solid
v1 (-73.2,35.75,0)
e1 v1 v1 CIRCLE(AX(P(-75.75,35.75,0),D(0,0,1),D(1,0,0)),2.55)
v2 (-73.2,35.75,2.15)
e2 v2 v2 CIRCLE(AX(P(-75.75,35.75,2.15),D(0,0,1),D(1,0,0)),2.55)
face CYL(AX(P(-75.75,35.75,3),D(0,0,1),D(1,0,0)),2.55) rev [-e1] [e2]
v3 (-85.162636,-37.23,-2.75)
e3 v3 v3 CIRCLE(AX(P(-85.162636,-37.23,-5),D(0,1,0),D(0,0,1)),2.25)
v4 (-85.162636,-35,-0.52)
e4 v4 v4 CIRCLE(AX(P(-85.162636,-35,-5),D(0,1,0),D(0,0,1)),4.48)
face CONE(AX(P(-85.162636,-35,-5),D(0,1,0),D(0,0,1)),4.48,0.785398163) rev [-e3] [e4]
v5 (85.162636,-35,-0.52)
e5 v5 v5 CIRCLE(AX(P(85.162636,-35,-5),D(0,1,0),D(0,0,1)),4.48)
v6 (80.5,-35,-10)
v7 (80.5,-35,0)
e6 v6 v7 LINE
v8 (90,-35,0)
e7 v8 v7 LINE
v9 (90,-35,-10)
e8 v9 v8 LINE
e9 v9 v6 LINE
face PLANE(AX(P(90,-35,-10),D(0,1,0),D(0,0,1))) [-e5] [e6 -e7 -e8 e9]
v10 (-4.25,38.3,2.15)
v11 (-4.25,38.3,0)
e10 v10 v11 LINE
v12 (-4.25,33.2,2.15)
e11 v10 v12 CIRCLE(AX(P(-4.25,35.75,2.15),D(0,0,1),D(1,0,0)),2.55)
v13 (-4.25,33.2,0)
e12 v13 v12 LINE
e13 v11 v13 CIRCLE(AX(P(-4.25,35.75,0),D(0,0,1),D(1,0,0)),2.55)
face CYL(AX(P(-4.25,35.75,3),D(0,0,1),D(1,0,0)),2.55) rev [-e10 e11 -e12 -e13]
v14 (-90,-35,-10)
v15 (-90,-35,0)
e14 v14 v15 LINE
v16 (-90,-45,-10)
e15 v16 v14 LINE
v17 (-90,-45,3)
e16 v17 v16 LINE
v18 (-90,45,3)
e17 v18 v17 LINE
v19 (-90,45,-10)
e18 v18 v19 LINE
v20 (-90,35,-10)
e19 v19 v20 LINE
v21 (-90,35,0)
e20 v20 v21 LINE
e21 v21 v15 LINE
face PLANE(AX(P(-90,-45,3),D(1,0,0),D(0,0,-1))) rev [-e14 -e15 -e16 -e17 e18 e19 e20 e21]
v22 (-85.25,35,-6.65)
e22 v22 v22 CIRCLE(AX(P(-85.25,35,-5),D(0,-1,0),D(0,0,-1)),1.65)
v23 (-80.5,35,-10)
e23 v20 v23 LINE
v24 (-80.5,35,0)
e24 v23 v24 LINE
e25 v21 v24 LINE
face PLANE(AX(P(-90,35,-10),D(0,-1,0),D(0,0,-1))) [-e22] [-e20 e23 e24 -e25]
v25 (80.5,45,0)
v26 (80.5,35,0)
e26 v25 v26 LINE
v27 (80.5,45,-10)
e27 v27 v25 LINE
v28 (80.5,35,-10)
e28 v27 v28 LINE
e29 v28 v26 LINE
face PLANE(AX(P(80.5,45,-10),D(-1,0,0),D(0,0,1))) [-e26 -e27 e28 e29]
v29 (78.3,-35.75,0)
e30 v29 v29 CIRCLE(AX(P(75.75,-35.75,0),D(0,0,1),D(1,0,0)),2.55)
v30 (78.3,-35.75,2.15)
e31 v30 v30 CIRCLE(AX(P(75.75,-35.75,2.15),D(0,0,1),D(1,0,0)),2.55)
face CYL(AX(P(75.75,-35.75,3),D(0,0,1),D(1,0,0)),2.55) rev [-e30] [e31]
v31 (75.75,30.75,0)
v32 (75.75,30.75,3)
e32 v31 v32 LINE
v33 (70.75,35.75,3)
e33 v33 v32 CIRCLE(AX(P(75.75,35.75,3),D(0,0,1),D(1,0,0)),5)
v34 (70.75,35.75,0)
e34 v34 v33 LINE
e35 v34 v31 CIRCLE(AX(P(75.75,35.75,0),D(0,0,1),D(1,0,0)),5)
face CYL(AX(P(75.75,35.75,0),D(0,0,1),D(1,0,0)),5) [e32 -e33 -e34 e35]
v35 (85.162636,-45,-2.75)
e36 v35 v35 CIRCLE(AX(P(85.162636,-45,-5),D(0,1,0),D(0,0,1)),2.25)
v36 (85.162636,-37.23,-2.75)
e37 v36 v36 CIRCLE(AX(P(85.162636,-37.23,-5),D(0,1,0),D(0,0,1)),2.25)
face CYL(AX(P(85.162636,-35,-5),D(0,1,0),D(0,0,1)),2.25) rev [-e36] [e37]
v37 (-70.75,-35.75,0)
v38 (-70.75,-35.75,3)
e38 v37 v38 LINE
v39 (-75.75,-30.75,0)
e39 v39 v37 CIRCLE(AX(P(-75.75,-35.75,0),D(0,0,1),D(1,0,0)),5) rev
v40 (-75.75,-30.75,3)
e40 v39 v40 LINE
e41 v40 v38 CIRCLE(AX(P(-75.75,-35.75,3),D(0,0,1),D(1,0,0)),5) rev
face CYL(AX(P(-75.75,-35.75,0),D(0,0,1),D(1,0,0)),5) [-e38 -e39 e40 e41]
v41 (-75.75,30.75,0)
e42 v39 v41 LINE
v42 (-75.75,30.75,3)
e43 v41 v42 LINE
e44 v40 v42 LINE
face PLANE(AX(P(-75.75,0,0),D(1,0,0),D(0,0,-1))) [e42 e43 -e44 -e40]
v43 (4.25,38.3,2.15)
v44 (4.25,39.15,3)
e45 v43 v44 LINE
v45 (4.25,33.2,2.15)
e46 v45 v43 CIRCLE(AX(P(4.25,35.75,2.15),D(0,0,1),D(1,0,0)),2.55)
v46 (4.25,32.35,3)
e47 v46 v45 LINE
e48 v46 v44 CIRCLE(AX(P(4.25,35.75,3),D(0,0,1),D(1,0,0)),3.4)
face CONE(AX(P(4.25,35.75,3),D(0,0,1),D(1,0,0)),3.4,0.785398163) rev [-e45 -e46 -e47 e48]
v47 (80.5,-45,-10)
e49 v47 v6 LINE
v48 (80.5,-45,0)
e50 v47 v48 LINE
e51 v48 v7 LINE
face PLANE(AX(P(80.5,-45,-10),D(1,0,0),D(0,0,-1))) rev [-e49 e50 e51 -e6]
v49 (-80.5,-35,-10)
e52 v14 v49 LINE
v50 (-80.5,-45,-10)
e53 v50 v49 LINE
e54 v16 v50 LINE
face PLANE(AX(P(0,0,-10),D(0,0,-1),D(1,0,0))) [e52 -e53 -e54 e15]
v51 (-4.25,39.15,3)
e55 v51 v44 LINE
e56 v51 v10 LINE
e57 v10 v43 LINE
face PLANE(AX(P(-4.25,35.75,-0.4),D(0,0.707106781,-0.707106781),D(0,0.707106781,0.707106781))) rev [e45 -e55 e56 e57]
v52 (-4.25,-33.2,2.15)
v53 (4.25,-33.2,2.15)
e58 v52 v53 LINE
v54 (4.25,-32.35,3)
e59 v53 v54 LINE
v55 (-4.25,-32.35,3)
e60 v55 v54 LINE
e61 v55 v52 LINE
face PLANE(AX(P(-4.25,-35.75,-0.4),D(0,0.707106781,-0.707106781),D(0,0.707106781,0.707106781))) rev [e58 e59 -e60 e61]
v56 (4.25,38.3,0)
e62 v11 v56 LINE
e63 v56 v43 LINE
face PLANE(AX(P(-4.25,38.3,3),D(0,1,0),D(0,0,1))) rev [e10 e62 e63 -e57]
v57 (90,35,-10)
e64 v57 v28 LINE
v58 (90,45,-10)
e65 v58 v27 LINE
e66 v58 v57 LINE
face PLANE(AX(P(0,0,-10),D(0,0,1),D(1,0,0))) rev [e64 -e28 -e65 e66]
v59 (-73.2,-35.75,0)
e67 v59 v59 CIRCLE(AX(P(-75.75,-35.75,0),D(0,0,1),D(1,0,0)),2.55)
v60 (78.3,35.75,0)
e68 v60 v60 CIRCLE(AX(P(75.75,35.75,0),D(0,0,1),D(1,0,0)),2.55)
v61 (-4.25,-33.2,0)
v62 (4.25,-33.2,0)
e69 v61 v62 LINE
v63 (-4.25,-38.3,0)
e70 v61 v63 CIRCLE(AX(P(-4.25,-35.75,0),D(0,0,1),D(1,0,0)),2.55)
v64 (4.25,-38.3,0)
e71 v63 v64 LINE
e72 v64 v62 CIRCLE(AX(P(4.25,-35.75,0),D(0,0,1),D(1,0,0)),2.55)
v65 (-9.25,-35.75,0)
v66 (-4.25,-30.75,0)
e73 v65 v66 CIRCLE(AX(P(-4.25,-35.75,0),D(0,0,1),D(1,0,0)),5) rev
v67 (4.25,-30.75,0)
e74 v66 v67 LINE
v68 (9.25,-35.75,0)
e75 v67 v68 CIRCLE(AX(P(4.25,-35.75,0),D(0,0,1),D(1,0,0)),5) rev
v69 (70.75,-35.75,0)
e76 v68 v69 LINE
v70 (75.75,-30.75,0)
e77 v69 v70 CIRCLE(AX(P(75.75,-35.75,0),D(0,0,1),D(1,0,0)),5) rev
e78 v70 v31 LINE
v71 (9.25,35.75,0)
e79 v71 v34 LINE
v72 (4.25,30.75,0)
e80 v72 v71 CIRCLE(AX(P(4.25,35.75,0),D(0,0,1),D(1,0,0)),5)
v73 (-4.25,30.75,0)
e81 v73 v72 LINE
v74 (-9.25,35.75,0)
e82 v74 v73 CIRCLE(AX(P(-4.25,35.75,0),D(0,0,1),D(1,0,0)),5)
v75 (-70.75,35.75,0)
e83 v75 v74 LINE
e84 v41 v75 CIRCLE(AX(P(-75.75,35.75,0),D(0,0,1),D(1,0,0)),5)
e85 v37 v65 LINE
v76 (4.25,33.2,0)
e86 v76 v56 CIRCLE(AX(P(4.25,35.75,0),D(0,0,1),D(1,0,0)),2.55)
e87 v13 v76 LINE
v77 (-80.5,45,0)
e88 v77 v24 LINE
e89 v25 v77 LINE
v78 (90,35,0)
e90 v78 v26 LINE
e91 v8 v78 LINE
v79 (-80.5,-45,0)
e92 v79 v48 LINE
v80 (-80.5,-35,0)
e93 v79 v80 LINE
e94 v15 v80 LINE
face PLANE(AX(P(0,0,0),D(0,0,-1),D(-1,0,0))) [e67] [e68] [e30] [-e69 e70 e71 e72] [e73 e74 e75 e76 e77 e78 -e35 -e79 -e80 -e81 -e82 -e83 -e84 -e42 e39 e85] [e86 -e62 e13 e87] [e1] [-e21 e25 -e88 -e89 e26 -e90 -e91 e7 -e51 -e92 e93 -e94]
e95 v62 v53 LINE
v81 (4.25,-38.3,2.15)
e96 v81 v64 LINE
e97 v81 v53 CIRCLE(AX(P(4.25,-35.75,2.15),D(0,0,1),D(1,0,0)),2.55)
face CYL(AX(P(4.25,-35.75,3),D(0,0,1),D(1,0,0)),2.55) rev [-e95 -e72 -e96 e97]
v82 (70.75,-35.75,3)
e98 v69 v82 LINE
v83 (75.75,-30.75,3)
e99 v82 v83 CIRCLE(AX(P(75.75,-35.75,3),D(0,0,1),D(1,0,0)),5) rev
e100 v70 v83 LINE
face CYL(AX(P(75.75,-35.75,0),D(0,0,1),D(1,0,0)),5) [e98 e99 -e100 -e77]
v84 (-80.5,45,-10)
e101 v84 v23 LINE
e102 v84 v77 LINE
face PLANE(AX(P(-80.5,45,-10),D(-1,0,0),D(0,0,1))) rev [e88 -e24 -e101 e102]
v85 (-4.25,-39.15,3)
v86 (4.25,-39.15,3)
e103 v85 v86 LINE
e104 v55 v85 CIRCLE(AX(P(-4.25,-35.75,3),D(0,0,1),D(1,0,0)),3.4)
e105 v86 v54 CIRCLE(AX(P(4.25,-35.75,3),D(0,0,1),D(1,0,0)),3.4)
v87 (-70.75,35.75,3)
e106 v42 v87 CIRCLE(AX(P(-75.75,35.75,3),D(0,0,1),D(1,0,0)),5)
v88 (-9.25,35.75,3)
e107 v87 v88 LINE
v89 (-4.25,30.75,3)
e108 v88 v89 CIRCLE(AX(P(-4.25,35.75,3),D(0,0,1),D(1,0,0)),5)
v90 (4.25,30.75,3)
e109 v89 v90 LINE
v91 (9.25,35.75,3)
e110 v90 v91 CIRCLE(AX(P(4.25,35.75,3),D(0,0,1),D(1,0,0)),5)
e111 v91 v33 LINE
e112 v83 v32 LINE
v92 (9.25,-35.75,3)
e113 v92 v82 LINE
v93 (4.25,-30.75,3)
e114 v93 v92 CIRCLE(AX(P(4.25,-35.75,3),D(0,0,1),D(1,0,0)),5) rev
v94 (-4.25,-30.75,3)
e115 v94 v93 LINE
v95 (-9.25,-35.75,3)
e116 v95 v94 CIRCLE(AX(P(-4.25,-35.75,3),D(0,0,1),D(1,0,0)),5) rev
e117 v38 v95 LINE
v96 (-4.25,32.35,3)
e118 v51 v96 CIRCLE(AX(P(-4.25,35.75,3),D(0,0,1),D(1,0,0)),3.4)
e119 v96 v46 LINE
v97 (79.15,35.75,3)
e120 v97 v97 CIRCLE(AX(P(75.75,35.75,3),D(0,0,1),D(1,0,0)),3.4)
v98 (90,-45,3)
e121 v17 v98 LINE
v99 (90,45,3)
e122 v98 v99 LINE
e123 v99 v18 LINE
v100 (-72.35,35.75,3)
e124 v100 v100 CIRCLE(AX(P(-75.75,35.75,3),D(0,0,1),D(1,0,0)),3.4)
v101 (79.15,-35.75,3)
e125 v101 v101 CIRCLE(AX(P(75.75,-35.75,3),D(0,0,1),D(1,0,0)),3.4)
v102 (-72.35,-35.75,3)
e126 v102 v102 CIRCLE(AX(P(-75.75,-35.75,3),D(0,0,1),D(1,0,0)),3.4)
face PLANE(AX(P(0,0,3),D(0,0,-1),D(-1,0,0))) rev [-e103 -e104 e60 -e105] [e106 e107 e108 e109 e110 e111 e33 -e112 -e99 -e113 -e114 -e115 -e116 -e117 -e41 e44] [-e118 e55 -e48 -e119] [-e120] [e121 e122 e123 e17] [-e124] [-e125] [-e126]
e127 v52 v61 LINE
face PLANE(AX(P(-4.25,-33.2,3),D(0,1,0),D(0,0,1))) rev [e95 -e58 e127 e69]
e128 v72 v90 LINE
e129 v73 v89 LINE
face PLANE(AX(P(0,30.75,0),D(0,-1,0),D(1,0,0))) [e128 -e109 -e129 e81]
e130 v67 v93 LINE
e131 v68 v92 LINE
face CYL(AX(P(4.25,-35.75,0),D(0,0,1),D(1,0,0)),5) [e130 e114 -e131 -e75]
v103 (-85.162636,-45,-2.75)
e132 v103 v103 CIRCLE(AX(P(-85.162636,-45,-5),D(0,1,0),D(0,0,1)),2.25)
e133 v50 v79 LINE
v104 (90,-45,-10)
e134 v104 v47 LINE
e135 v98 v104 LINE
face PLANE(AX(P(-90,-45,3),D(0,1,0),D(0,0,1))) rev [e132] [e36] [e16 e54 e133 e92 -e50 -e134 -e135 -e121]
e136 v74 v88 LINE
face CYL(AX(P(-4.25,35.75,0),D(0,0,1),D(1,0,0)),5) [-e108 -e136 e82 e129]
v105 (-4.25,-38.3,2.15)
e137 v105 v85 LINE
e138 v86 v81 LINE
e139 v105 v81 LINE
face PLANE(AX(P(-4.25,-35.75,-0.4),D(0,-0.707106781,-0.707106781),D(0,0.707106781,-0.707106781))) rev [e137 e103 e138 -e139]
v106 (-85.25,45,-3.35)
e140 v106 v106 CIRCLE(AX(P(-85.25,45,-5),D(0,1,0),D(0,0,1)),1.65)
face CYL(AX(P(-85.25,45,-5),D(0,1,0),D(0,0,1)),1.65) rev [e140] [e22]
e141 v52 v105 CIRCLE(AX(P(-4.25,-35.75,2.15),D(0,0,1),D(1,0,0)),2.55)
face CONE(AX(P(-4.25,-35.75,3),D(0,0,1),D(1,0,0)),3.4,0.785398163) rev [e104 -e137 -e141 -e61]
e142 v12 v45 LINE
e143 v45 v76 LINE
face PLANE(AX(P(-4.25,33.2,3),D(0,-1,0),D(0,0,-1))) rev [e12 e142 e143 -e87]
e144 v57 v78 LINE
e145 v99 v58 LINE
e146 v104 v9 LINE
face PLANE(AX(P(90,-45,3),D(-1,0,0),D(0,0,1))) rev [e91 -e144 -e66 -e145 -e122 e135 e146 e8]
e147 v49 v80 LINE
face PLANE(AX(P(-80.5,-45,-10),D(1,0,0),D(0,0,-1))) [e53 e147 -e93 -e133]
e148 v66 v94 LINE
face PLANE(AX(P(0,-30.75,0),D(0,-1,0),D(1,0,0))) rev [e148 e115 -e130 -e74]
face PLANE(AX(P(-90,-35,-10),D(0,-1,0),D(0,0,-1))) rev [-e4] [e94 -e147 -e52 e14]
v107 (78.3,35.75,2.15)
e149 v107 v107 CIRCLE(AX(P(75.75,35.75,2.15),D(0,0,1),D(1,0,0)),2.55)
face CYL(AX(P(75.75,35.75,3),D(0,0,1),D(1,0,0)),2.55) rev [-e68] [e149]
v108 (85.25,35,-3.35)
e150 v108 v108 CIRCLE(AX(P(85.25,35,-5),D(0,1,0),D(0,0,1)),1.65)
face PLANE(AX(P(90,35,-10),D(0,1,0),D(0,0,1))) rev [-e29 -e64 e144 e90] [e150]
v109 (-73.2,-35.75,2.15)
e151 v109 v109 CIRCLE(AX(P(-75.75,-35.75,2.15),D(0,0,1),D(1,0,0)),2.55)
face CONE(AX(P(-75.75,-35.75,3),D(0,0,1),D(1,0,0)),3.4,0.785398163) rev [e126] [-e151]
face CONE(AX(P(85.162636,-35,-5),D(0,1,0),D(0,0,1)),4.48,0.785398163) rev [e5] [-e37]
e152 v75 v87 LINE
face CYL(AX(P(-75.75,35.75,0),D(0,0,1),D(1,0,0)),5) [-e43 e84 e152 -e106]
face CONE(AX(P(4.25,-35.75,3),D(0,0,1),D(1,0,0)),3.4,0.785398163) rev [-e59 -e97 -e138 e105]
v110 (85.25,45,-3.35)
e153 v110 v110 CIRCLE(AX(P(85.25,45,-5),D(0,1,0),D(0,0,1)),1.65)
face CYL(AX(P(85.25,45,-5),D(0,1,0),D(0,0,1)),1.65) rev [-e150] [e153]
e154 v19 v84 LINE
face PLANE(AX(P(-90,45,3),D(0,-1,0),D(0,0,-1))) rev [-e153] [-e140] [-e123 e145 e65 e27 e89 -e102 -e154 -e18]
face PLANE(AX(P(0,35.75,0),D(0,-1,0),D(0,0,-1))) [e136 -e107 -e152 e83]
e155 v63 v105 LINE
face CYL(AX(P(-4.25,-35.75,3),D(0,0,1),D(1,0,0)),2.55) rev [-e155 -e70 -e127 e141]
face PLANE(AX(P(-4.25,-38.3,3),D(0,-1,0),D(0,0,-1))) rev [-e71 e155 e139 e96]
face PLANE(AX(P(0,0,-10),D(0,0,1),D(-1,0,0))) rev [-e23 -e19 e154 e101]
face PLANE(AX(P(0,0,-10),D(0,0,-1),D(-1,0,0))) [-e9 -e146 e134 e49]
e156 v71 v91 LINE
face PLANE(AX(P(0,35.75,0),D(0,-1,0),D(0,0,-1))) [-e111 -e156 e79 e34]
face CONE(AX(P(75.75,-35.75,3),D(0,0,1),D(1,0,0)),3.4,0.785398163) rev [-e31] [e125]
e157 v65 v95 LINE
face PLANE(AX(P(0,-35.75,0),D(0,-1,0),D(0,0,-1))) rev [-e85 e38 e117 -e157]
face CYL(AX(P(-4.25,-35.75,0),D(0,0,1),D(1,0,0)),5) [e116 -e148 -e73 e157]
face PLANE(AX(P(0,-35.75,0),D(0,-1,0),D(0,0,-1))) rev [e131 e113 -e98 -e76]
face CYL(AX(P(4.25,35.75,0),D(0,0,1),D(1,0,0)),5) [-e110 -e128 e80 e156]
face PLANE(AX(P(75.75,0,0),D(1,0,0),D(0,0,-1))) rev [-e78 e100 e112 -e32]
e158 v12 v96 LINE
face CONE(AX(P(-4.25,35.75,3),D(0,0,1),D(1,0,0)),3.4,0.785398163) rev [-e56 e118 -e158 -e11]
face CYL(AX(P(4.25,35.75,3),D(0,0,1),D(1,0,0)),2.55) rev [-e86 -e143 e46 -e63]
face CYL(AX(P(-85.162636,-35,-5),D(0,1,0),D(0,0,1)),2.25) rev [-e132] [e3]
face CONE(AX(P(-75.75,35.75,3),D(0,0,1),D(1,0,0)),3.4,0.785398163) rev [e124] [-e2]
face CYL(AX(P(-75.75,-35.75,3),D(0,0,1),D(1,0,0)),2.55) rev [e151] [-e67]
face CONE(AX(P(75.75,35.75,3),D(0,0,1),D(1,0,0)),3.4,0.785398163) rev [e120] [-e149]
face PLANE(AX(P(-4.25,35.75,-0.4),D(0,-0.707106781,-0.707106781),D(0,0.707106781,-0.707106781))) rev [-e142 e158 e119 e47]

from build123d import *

# Parameters (mm, degrees)
SKETCH3_W                                      = 180
SKETCH3_H                                      = 90
BOSS_EXTRUDE3_DEPTH                            = 3
SKETCH4_W                                      = 8.5
SKETCH4_H                                      = 61.5
CUT_EXTRUDE1_DEPTH                             = 3
CSK_FOR_M5_FLAT_HEAD_MACHINE_SCREW1_AT_2_COUNT = 2
CSK_FOR_M5_FLAT_HEAD_MACHINE_SCREW1_AT_2_PITCH = 167.524625056
CSK_FOR_M5_FLAT_HEAD_MACHINE_SCREW1_AT_3_COUNT = 2
CSK_FOR_M5_FLAT_HEAD_MACHINE_SCREW1_AT_3_PITCH = 71.5
CSK_FOR_M5_FLAT_HEAD_MACHINE_SCREW1_AT_4_COUNT = 2
CSK_FOR_M5_FLAT_HEAD_MACHINE_SCREW1_AT_4_PITCH = 151.5
CSK_SLOT_FOR_M5_FLAT_HEAD_MACHINE_SCREW1_DEPTH = 3
SKETCH12_W                                     = 9.5
SKETCH12_H                                     = 10
BOSS_EXTRUDE4_DEPTH                            = 10
CSK_FOR_M4_SFHCS1_D                            = 4.5
CSK_FOR_M4_SFHCS1_DEPTH                        = 10
CSK_FOR_M4_SFHCS1_CSINK_D                      = 8.96
CSK_FOR_M4_SFHCS1_CSINK_ANGLE                  = 90
M4X0_7_TAPPED_HOLE1_D                          = 3.3


with BuildPart() as part:
    # Sketch3 → Boss-Extrude3 (new body)
    with BuildSketch(Plane.XY):
        Rectangle(SKETCH3_W, SKETCH3_H)
    extrude(amount=BOSS_EXTRUDE3_DEPTH)

    # Sketch4 → Cut-Extrude1 (cut)
    with BuildSketch(Plane.XY.offset(3)):
        with BuildLine():
            Line((-4.25, -30.75), (-4.25, 30.75))
            ThreePointArc((-4.25, 30.75), (-7.785533906, 32.214466094), (-9.25, 35.75))
            Line((-9.25, 35.75), (-70.75, 35.75))
            ThreePointArc((-70.75, 35.75), (-72.214466094, 32.214466094), (-75.75, 30.75))
            Line((-75.75, 30.75), (-75.75, -30.75))
            ThreePointArc((-75.75, -30.75), (-72.214466094, -32.214466094), (-70.75, -35.75))
            Line((-70.75, -35.75), (-9.25, -35.75))
            ThreePointArc((-9.25, -35.75), (-7.785533906, -32.214466094), (-4.25, -30.75))
        make_face()
        Rectangle(SKETCH4_W, SKETCH4_H)
        with BuildLine():
            ThreePointArc((9.25, 35.75), (7.785533906, 32.214466094), (4.25, 30.75))
            Line((4.25, 30.75), (4.25, -30.75))
            ThreePointArc((4.25, -30.75), (7.785533906, -32.214466094), (9.25, -35.75))
            Line((9.25, -35.75), (70.75, -35.75))
            ThreePointArc((70.75, -35.75), (72.214466094, -32.214466094), (75.75, -30.75))
            Line((75.75, -30.75), (75.75, 30.75))
            ThreePointArc((75.75, 30.75), (72.214466094, 32.214466094), (70.75, 35.75))
            Line((70.75, 35.75), (9.25, 35.75))
        make_face()
    extrude(amount=-CUT_EXTRUDE1_DEPTH, mode=Mode.SUBTRACT)

    # Sketch8 → CSK for M5 Flat Head Machine Screw1 (revolve, cut)
    with BuildSketch(Plane(origin=(-75.75, 35.75, 3), x_dir=(0, -1, 0), z_dir=(1, 0, 0))):
        Polygon((0, 0), (0, 3), (2.55, 3), (2.55, 0.85), (3.4, 0), align=None)
    csk_for_m5_flat_head_machine_screw1 = revolve(axis=Axis((-75.75, 35.75, 9.35), (0, 0, -1)), mode=Mode.SUBTRACT)

    # CSK for M5 Flat Head Machine Screw1 at 2: CSK for M5 Flat Head Machine Screw1 ×2
    with Locations(*[Vector(0.9043446594777974, -0.4268029251000826, 0) * (i * CSK_FOR_M5_FLAT_HEAD_MACHINE_SCREW1_AT_2_PITCH) for i in range(1, CSK_FOR_M5_FLAT_HEAD_MACHINE_SCREW1_AT_2_COUNT)]):
        add(csk_for_m5_flat_head_machine_screw1, mode=Mode.SUBTRACT)

    # CSK for M5 Flat Head Machine Screw1 at 3: CSK for M5 Flat Head Machine Screw1 ×2
    with Locations(*[(0, -i * CSK_FOR_M5_FLAT_HEAD_MACHINE_SCREW1_AT_3_PITCH, 0) for i in range(1, CSK_FOR_M5_FLAT_HEAD_MACHINE_SCREW1_AT_3_COUNT)]):
        add(csk_for_m5_flat_head_machine_screw1, mode=Mode.SUBTRACT)

    # CSK for M5 Flat Head Machine Screw1 at 4: CSK for M5 Flat Head Machine Screw1 ×2
    with Locations(*[(i * CSK_FOR_M5_FLAT_HEAD_MACHINE_SCREW1_AT_4_PITCH, 0, 0) for i in range(1, CSK_FOR_M5_FLAT_HEAD_MACHINE_SCREW1_AT_4_COUNT)]):
        add(csk_for_m5_flat_head_machine_screw1, mode=Mode.SUBTRACT)

    # CSK SLOT for M5 Flat Head Machine Screw1: read off the stored shape, not the designer's step
    # CSK SLOT for M5 Flat Head Machine Sc 2 → CSK SLOT for M5 Flat Head Machine Screw1 (cut)
    with BuildSketch(Plane.XY):
        with BuildLine():
            Line((-4.25, 33.2), (4.25, 33.2))
            ThreePointArc((4.25, 33.2), (6.8, 35.75), (4.25, 38.3))
            Line((4.25, 38.3), (-4.25, 38.3))
            ThreePointArc((-4.25, 38.3), (-6.8, 35.75), (-4.25, 33.2))
        make_face()
        with BuildLine():
            Line((-4.25, -38.3), (4.25, -38.3))
            ThreePointArc((4.25, -38.3), (6.8, -35.75), (4.25, -33.2))
            Line((4.25, -33.2), (-4.25, -33.2))
            ThreePointArc((-4.25, -33.2), (-6.8, -35.75), (-4.25, -38.3))
        make_face()
    extrude(amount=CSK_SLOT_FOR_M5_FLAT_HEAD_MACHINE_SCREW1_DEPTH, mode=Mode.SUBTRACT)

    # CSK SLOT for M5 Flat Head Machine Sc 3: loft between two sections, ruled curve by curve
    csk_slot_for_m5_flat_head_machine_sc_3_from = [
        Edge.make_three_point_arc((4.25, 33.2, 2.15), (6.053122292, 33.946877708, 2.15), (6.8, 35.75, 2.15)),
        Edge.make_three_point_arc((6.8, 35.75, 2.15), (6.053122292, 37.553122292, 2.15), (4.25, 38.3, 2.15)),
        Edge.make_three_point_arc((-4.25, 38.3, 2.15), (-6.053122292, 37.553122292, 2.15), (-6.8, 35.75, 2.15)),
        Edge.make_three_point_arc((-6.8, 35.75, 2.15), (-6.053122292, 33.946877708, 2.15), (-4.25, 33.2, 2.15)),
        Edge.make_line((4.25, 38.3, 2.15), (-4.25, 38.3, 2.15)),
        Edge.make_line((4.25, 33.2, 2.15), (-4.25, 33.2, 2.15)),
    ]
    csk_slot_for_m5_flat_head_machine_sc_3_to = [
        Edge.make_three_point_arc((4.25, 32.35, 3), (6.654163056, 33.345836944, 3), (7.65, 35.75, 3)),
        Edge.make_three_point_arc((7.65, 35.75, 3), (6.654163056, 38.154163056, 3), (4.25, 39.15, 3)),
        Edge.make_three_point_arc((-4.25, 39.15, 3), (-6.654163056, 38.154163056, 3), (-7.65, 35.75, 3)),
        Edge.make_three_point_arc((-7.65, 35.75, 3), (-6.654163056, 33.345836944, 3), (-4.25, 32.35, 3)),
        Edge.make_line((4.25, 39.15, 3), (-4.25, 39.15, 3)),
        Edge.make_line((4.25, 32.35, 3), (-4.25, 32.35, 3)),
    ]
    csk_slot_for_m5_flat_head_machine_sc_3 = Solid(Shell([*[Face.make_surface_from_curves(csk_slot_for_m5_flat_head_machine_sc_3_from[k], csk_slot_for_m5_flat_head_machine_sc_3_to[k]) for k in range(6)], Face(Wire(csk_slot_for_m5_flat_head_machine_sc_3_from)), Face(Wire(csk_slot_for_m5_flat_head_machine_sc_3_to))]))
    add(csk_slot_for_m5_flat_head_machine_sc_3, mode=Mode.SUBTRACT)

    # CSK SLOT for M5 Flat Head Machine Sc 4: loft between two sections, ruled curve by curve
    csk_slot_for_m5_flat_head_machine_sc_4_from = [
        Edge.make_three_point_arc((4.25, -38.3, 2.15), (6.053122292, -37.553122292, 2.15), (6.8, -35.75, 2.15)),
        Edge.make_three_point_arc((6.8, -35.75, 2.15), (6.053122292, -33.946877708, 2.15), (4.25, -33.2, 2.15)),
        Edge.make_three_point_arc((-4.25, -33.2, 2.15), (-6.053122292, -33.946877708, 2.15), (-6.8, -35.75, 2.15)),
        Edge.make_three_point_arc((-6.8, -35.75, 2.15), (-6.053122292, -37.553122292, 2.15), (-4.25, -38.3, 2.15)),
        Edge.make_line((4.25, -33.2, 2.15), (-4.25, -33.2, 2.15)),
        Edge.make_line((4.25, -38.3, 2.15), (-4.25, -38.3, 2.15)),
    ]
    csk_slot_for_m5_flat_head_machine_sc_4_to = [
        Edge.make_three_point_arc((4.25, -39.15, 3), (6.654163056, -38.154163056, 3), (7.65, -35.75, 3)),
        Edge.make_three_point_arc((7.65, -35.75, 3), (6.654163056, -33.345836944, 3), (4.25, -32.35, 3)),
        Edge.make_three_point_arc((-4.25, -32.35, 3), (-6.654163056, -33.345836944, 3), (-7.65, -35.75, 3)),
        Edge.make_three_point_arc((-7.65, -35.75, 3), (-6.654163056, -38.154163056, 3), (-4.25, -39.15, 3)),
        Edge.make_line((4.25, -32.35, 3), (-4.25, -32.35, 3)),
        Edge.make_line((4.25, -39.15, 3), (-4.25, -39.15, 3)),
    ]
    csk_slot_for_m5_flat_head_machine_sc_4 = Solid(Shell([*[Face.make_surface_from_curves(csk_slot_for_m5_flat_head_machine_sc_4_from[k], csk_slot_for_m5_flat_head_machine_sc_4_to[k]) for k in range(6)], Face(Wire(csk_slot_for_m5_flat_head_machine_sc_4_from)), Face(Wire(csk_slot_for_m5_flat_head_machine_sc_4_to))]))
    add(csk_slot_for_m5_flat_head_machine_sc_4, mode=Mode.SUBTRACT)

    # Sketch12 → Boss-Extrude4 (add)
    with BuildSketch(Plane(origin=(0, 0, 0), x_dir=(-1, 0, 0), z_dir=(0, 0, -1))):
        with Locations((-85.25, 40)):
            Rectangle(SKETCH12_W, SKETCH12_H)
        with Locations((-85.25, -40)):
            Rectangle(SKETCH12_W, SKETCH12_H)
    boss_extrude4 = extrude(amount=BOSS_EXTRUDE4_DEPTH)

    # CSK for M4 SFHCS1
    with Locations(Plane(origin=(0, -35, 0), x_dir=(1, 0, 0), z_dir=(0, 1, 0))):
        with Locations((85.162636167, 5)):
            csk_for_m4_sfhcs1 = CounterSinkHole(CSK_FOR_M4_SFHCS1_D / 2, CSK_FOR_M4_SFHCS1_CSINK_D / 2, depth=CSK_FOR_M4_SFHCS1_DEPTH, counter_sink_angle=CSK_FOR_M4_SFHCS1_CSINK_ANGLE)

    # M4x0.7 Tapped Hole1 (through all)
    with Locations(Plane(origin=(0, 45, 0), x_dir=(1, 0, 0), z_dir=(0, 1, 0))):
        with Locations((85.25, 5)):
            m4x0_7_tapped_hole1 = Hole(M4X0_7_TAPPED_HOLE1_D / 2)

    # Mirror1: Boss-Extrude4, CSK for M4 SFHCS1, M4x0.7 Tapped Hole1 across plane
    add(boss_extrude4.mirror(Plane(origin=(0, 0, 0), x_dir=(0, 0, 1), z_dir=(1, 0, 0))))
    add(csk_for_m4_sfhcs1.mirror(Plane(origin=(0, 0, 0), x_dir=(0, 0, 1), z_dir=(1, 0, 0))), mode=Mode.SUBTRACT)
    add(m4x0_7_tapped_hole1.mirror(Plane(origin=(0, 0, 0), x_dir=(0, 0, 1), z_dir=(1, 0, 0))), mode=Mode.SUBTRACT)


solid = part.part
